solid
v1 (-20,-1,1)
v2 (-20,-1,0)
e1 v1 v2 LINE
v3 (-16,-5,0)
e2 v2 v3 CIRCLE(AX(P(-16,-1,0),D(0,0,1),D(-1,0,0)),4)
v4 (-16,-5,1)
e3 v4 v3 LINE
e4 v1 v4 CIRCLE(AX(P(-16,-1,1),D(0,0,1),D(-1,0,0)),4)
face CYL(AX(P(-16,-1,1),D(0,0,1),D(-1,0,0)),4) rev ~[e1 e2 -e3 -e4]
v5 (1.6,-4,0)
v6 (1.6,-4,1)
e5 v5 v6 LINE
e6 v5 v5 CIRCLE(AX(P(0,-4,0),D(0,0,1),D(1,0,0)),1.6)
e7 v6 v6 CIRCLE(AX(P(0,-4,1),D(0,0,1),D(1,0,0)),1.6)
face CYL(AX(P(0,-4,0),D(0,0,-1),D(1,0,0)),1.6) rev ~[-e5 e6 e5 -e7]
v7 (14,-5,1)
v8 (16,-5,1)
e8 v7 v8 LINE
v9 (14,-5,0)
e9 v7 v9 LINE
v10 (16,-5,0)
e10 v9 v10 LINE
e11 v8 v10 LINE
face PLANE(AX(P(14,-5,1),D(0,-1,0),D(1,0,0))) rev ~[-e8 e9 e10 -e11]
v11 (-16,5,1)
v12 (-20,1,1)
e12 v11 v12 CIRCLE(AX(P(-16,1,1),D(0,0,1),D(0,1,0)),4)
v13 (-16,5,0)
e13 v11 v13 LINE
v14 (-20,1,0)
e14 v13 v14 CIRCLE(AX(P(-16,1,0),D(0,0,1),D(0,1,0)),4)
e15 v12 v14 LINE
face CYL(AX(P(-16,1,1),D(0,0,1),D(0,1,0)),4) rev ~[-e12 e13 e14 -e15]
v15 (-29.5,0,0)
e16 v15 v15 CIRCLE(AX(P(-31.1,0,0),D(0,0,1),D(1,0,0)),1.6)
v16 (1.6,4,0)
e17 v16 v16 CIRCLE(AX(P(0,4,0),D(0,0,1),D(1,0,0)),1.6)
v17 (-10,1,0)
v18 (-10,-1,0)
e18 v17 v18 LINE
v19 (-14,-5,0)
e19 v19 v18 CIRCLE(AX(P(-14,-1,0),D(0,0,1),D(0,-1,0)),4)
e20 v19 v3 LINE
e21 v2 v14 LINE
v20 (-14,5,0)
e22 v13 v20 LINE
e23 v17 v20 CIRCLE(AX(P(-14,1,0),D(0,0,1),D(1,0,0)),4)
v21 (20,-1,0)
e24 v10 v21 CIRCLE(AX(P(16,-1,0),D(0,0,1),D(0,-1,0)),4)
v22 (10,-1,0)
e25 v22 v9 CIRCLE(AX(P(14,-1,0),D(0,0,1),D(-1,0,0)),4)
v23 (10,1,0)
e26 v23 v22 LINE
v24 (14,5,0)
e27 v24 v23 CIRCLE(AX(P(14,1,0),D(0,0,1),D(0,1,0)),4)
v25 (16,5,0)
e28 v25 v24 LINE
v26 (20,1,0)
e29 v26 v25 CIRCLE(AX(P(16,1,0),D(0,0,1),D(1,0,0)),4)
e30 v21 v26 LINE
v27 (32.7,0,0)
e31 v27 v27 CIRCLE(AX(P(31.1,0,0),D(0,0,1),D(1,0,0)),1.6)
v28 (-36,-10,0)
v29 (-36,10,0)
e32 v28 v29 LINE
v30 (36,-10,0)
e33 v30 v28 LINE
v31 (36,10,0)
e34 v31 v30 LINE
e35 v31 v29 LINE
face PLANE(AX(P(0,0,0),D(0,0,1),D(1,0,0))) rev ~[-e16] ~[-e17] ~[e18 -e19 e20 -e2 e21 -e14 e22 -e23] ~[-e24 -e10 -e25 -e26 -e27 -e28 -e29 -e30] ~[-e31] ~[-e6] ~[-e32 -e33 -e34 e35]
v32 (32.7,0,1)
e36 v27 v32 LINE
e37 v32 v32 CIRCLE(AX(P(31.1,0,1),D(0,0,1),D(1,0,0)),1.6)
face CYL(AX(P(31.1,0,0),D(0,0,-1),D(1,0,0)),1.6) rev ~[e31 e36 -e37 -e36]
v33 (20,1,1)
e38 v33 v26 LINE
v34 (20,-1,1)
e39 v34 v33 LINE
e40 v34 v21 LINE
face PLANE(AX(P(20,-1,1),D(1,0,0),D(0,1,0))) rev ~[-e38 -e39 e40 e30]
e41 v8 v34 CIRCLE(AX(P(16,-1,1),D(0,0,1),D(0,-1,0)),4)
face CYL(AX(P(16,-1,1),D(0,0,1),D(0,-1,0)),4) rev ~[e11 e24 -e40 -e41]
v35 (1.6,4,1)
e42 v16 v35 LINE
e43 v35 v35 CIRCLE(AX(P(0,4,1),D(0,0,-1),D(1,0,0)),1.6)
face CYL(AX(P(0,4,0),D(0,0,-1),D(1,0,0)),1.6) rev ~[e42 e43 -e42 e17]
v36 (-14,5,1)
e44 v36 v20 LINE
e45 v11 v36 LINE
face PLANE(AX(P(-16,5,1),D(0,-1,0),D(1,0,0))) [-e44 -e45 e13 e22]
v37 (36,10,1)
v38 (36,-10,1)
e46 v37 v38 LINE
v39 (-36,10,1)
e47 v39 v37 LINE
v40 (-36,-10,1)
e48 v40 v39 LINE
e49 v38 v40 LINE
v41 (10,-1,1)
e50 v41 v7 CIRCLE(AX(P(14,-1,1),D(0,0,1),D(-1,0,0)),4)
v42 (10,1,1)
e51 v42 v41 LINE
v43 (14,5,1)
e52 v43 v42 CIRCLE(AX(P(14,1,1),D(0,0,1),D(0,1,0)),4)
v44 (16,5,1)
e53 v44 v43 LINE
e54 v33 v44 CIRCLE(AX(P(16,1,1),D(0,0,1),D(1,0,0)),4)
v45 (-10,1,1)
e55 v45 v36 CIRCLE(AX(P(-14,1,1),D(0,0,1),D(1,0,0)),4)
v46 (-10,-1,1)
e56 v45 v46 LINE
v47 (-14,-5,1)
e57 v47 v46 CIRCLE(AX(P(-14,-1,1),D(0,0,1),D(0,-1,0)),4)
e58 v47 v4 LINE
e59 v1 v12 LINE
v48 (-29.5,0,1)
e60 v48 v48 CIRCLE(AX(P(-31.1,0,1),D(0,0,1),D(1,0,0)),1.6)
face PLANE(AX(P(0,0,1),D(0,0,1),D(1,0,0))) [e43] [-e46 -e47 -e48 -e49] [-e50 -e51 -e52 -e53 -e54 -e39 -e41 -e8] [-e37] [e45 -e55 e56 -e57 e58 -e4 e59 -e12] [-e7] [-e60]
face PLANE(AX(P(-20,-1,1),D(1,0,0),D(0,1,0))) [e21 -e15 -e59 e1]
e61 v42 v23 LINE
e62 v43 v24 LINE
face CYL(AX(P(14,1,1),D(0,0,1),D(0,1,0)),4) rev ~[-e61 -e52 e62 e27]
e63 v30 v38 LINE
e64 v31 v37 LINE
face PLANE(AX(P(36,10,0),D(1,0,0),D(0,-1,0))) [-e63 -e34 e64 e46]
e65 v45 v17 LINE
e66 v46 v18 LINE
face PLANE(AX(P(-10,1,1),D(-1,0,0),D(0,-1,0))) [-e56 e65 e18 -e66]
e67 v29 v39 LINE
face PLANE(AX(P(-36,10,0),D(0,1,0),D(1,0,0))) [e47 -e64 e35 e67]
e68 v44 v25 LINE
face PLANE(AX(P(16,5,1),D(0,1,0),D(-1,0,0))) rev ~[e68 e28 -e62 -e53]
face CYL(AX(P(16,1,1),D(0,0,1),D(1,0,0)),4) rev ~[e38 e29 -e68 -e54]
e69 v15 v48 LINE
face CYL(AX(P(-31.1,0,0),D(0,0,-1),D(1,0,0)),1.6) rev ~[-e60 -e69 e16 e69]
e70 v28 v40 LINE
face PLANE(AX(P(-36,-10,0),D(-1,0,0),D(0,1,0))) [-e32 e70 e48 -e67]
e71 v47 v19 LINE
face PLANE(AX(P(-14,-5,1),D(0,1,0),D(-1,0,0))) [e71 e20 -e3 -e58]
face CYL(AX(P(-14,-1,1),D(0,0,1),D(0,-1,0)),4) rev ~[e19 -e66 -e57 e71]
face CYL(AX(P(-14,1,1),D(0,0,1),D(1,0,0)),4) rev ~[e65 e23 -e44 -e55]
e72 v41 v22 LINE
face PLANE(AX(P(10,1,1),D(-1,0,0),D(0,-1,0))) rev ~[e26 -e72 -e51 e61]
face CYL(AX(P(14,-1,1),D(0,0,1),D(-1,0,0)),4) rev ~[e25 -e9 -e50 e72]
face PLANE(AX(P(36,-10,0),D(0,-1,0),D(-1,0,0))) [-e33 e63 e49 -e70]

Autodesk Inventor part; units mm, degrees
ref_plane "YZ Plane" through (0, 0, 0) normal (1, 0, 0) x (0, 1, 0)
ref_plane "XZ Plane" through (0, 0, 0) normal (0, 1, 0) x (-1, 0, 0)
ref_plane "XY Plane" through (0, 0, 0) normal (0, 0, 1) x (1, 0, 0)
sketch "Sketch2" plane through (0, 0, 1) normal (0, 0, 1) x (1, 0, 0)
  line L0 (-17.5, 32.5) -> (-12.5, 32.5)
  line L1 (-7.5, 27.5) -> (-7.5, 12.5)
  line L2 (-12.5, 7.5) -> (-17.5, 7.5)
  line L3 (-22.5, 12.5) -> (-22.5, 27.5)
  line L4 (-22.5, 32.5) -> (-7.5, 7.5) construction
  line L5 (-7.5, 32.5) -> (-22.5, 7.5) construction
  line L6 (0, 16.0345) -> (0, -16.0345)
  line L7 (-10.8621, 0) -> (10.8621, 0)
  arc A0 (-17.5, 32.5) -> (-22.5, 27.5) centre (-17.5, 27.5) ccw
  arc A1 (-7.5, 27.5) -> (-12.5, 32.5) centre (-12.5, 27.5) ccw
  arc A2 (-12.5, 7.5) -> (-7.5, 12.5) centre (-12.5, 12.5) ccw
  arc A3 (-22.5, 12.5) -> (-17.5, 7.5) centre (-17.5, 12.5) ccw
  line L8 (17.5, 32.5) -> (12.5, 32.5)
  line L9 (7.5, 27.5) -> (7.5, 12.5)
  line L10 (12.5, 7.5) -> (17.5, 7.5)
  line L11 (22.5, 12.5) -> (22.5, 27.5)
  line L12 (22.5, 32.5) -> (7.5, 7.5) construction
  line L13 (7.5, 32.5) -> (22.5, 7.5) construction
  arc A4 (22.5, 27.5) -> (17.5, 32.5) centre (17.5, 27.5) ccw
  arc A5 (12.5, 32.5) -> (7.5, 27.5) centre (12.5, 27.5) ccw
  arc A6 (7.5, 12.5) -> (12.5, 7.5) centre (12.5, 12.5) ccw
  arc A7 (17.5, 7.5) -> (22.5, 12.5) centre (17.5, 12.5) ccw
  line L14 (-17.5, -32.5) -> (-12.5, -32.5)
  line L15 (-7.5, -27.5) -> (-7.5, -12.5)
  line L16 (-12.5, -7.5) -> (-17.5, -7.5)
  line L17 (-22.5, -12.5) -> (-22.5, -27.5)
  line L18 (-22.5, -32.5) -> (-7.5, -7.5) construction
  line L19 (-7.5, -32.5) -> (-22.5, -7.5) construction
  arc A8 (-22.5, -27.5) -> (-17.5, -32.5) centre (-17.5, -27.5) ccw
  arc A9 (-12.5, -32.5) -> (-7.5, -27.5) centre (-12.5, -27.5) ccw
  arc A10 (-7.5, -12.5) -> (-12.5, -7.5) centre (-12.5, -12.5) ccw
  arc A11 (-17.5, -7.5) -> (-22.5, -12.5) centre (-17.5, -12.5) ccw
  arc A12 (12.5, -7.5) -> (7.5, -12.5) centre (12.5, -12.5) ccw
  line L20 (12.5, -7.5) -> (17.5, -7.5)
  arc A13 (22.5, -12.5) -> (17.5, -7.5) centre (17.5, -12.5) ccw
  line L21 (7.5, -27.5) -> (7.5, -12.5)
  line L22 (22.5, -12.5) -> (22.5, -27.5)
  arc A14 (7.5, -27.5) -> (12.5, -32.5) centre (12.5, -27.5) ccw
  line L23 (7.5, -32.5) -> (22.5, -7.5) construction
  line L24 (22.5, -32.5) -> (7.5, -7.5) construction
  line L25 (17.5, -32.5) -> (12.5, -32.5)
  arc A15 (17.5, -32.5) -> (22.5, -27.5) centre (17.5, -27.5) ccw
  point P0 (0, 0)
  point P1 (-15, 20)
  point P2 (0, 0)
  point P3 (15, 20)
  point P4 (-15, -20)
  point P5 (15, -20)
  dimension "d13" = 15
  dimension "d14" = 15
  dimension "d15" = 15
  dimension "d16" = 25
  dimension "d17" = 5
sketch "Sketch1" plane through (0, 0, 0) normal (0, 0, 1) x (1, 0, 0)
  line L0 (-36, 10) -> (36, 10)
  line L1 (36, 10) -> (36, -10)
  line L2 (36, -10) -> (-36, -10)
  line L3 (-36, -10) -> (-36, 10)
  line L4 (-36, 10) -> (36, -10) construction
  line L5 (36, 10) -> (-36, -10) construction
  circle A0 centre (31.1, 0) radius 1.6
  line L6 (0, 0) -> (12.8976, 0)
  line L7 (0, 0) -> (0, 11.3109)
  circle A1 centre (-31.1, 0) radius 1.6
  circle A2 centre (0, 4) radius 1.6
  circle A3 centre (0, -4) radius 1.6
  dimension "d0" = 72
  dimension "d1" = 20
  dimension "d2" = 3.2
  dimension "d3" = 4.9
  dimension "d11" = 3.2
  dimension "d12" = 6
extrude "Plate1" add sketch "Sketch1" along normal blind 1
sketch "Sketch3" plane through (0, 0, 1) normal (0, 0, 1) x (1, 0, 0)
  line L0 (-16, 5) -> (-14, 5)
  line L1 (-10, 1) -> (-10, -1)
  line L2 (-14, -5) -> (-16, -5)
  line L3 (-20, -1) -> (-20, 1)
  line L4 (-20, 5) -> (-10, -5) construction
  line L5 (-10, 5) -> (-20, -5) construction
  arc A0 (-16, 5) -> (-20, 1) centre (-16, 1) ccw
  arc A1 (-20, -1) -> (-16, -5) centre (-16, -1) ccw
  arc A2 (-14, -5) -> (-10, -1) centre (-14, -1) ccw
  arc A3 (-10, 1) -> (-14, 5) centre (-14, 1) ccw
  line L6 (0, 0) -> (0, 8.5003)
  line L7 (16, 5) -> (14, 5)
  line L8 (10, 1) -> (10, -1)
  line L9 (14, -5) -> (16, -5)
  line L10 (20, -1) -> (20, 1)
  line L11 (20, 5) -> (10, -5) construction
  line L12 (10, 5) -> (20, -5) construction
  arc A4 (20, 1) -> (16, 5) centre (16, 1) ccw
  arc A5 (16, -5) -> (20, -1) centre (16, -1) ccw
  arc A6 (10, -1) -> (14, -5) centre (14, -1) ccw
  arc A7 (14, 5) -> (10, 1) centre (14, 1) ccw
  point P0 (-15, 0)
  point P1 (15, 0)
  dimension "d20" = 10
  dimension "d21" = 10
  dimension "d22" = 4
  dimension "d23" = 20
extrude "Cut2" cut sketch "Sketch3" against normal blind 1
equation "\"d24\" = 厚度"
equation "\"d5\" = 厚度"
equation "\"折彎半徑\" = 厚度"
equation "\"折彎離隙寬度\" = 厚度"
equation "\"折彎離隙深度\" = 0.5 * 厚度"
equation "\"轉角離隙大小\" = 4 * 厚度"
equation "\"最小剩餘\" = 2 * 厚度"
equation "\"轉移半徑\" = 折彎半徑"
equation "\"Jacobi半徑大小\" = 折彎半徑"
equation "\"間隙大小\" = 厚度"
equation "\"厚度\" = 1"
properties part number "battery_box_5V_back" material "Aluminum"
